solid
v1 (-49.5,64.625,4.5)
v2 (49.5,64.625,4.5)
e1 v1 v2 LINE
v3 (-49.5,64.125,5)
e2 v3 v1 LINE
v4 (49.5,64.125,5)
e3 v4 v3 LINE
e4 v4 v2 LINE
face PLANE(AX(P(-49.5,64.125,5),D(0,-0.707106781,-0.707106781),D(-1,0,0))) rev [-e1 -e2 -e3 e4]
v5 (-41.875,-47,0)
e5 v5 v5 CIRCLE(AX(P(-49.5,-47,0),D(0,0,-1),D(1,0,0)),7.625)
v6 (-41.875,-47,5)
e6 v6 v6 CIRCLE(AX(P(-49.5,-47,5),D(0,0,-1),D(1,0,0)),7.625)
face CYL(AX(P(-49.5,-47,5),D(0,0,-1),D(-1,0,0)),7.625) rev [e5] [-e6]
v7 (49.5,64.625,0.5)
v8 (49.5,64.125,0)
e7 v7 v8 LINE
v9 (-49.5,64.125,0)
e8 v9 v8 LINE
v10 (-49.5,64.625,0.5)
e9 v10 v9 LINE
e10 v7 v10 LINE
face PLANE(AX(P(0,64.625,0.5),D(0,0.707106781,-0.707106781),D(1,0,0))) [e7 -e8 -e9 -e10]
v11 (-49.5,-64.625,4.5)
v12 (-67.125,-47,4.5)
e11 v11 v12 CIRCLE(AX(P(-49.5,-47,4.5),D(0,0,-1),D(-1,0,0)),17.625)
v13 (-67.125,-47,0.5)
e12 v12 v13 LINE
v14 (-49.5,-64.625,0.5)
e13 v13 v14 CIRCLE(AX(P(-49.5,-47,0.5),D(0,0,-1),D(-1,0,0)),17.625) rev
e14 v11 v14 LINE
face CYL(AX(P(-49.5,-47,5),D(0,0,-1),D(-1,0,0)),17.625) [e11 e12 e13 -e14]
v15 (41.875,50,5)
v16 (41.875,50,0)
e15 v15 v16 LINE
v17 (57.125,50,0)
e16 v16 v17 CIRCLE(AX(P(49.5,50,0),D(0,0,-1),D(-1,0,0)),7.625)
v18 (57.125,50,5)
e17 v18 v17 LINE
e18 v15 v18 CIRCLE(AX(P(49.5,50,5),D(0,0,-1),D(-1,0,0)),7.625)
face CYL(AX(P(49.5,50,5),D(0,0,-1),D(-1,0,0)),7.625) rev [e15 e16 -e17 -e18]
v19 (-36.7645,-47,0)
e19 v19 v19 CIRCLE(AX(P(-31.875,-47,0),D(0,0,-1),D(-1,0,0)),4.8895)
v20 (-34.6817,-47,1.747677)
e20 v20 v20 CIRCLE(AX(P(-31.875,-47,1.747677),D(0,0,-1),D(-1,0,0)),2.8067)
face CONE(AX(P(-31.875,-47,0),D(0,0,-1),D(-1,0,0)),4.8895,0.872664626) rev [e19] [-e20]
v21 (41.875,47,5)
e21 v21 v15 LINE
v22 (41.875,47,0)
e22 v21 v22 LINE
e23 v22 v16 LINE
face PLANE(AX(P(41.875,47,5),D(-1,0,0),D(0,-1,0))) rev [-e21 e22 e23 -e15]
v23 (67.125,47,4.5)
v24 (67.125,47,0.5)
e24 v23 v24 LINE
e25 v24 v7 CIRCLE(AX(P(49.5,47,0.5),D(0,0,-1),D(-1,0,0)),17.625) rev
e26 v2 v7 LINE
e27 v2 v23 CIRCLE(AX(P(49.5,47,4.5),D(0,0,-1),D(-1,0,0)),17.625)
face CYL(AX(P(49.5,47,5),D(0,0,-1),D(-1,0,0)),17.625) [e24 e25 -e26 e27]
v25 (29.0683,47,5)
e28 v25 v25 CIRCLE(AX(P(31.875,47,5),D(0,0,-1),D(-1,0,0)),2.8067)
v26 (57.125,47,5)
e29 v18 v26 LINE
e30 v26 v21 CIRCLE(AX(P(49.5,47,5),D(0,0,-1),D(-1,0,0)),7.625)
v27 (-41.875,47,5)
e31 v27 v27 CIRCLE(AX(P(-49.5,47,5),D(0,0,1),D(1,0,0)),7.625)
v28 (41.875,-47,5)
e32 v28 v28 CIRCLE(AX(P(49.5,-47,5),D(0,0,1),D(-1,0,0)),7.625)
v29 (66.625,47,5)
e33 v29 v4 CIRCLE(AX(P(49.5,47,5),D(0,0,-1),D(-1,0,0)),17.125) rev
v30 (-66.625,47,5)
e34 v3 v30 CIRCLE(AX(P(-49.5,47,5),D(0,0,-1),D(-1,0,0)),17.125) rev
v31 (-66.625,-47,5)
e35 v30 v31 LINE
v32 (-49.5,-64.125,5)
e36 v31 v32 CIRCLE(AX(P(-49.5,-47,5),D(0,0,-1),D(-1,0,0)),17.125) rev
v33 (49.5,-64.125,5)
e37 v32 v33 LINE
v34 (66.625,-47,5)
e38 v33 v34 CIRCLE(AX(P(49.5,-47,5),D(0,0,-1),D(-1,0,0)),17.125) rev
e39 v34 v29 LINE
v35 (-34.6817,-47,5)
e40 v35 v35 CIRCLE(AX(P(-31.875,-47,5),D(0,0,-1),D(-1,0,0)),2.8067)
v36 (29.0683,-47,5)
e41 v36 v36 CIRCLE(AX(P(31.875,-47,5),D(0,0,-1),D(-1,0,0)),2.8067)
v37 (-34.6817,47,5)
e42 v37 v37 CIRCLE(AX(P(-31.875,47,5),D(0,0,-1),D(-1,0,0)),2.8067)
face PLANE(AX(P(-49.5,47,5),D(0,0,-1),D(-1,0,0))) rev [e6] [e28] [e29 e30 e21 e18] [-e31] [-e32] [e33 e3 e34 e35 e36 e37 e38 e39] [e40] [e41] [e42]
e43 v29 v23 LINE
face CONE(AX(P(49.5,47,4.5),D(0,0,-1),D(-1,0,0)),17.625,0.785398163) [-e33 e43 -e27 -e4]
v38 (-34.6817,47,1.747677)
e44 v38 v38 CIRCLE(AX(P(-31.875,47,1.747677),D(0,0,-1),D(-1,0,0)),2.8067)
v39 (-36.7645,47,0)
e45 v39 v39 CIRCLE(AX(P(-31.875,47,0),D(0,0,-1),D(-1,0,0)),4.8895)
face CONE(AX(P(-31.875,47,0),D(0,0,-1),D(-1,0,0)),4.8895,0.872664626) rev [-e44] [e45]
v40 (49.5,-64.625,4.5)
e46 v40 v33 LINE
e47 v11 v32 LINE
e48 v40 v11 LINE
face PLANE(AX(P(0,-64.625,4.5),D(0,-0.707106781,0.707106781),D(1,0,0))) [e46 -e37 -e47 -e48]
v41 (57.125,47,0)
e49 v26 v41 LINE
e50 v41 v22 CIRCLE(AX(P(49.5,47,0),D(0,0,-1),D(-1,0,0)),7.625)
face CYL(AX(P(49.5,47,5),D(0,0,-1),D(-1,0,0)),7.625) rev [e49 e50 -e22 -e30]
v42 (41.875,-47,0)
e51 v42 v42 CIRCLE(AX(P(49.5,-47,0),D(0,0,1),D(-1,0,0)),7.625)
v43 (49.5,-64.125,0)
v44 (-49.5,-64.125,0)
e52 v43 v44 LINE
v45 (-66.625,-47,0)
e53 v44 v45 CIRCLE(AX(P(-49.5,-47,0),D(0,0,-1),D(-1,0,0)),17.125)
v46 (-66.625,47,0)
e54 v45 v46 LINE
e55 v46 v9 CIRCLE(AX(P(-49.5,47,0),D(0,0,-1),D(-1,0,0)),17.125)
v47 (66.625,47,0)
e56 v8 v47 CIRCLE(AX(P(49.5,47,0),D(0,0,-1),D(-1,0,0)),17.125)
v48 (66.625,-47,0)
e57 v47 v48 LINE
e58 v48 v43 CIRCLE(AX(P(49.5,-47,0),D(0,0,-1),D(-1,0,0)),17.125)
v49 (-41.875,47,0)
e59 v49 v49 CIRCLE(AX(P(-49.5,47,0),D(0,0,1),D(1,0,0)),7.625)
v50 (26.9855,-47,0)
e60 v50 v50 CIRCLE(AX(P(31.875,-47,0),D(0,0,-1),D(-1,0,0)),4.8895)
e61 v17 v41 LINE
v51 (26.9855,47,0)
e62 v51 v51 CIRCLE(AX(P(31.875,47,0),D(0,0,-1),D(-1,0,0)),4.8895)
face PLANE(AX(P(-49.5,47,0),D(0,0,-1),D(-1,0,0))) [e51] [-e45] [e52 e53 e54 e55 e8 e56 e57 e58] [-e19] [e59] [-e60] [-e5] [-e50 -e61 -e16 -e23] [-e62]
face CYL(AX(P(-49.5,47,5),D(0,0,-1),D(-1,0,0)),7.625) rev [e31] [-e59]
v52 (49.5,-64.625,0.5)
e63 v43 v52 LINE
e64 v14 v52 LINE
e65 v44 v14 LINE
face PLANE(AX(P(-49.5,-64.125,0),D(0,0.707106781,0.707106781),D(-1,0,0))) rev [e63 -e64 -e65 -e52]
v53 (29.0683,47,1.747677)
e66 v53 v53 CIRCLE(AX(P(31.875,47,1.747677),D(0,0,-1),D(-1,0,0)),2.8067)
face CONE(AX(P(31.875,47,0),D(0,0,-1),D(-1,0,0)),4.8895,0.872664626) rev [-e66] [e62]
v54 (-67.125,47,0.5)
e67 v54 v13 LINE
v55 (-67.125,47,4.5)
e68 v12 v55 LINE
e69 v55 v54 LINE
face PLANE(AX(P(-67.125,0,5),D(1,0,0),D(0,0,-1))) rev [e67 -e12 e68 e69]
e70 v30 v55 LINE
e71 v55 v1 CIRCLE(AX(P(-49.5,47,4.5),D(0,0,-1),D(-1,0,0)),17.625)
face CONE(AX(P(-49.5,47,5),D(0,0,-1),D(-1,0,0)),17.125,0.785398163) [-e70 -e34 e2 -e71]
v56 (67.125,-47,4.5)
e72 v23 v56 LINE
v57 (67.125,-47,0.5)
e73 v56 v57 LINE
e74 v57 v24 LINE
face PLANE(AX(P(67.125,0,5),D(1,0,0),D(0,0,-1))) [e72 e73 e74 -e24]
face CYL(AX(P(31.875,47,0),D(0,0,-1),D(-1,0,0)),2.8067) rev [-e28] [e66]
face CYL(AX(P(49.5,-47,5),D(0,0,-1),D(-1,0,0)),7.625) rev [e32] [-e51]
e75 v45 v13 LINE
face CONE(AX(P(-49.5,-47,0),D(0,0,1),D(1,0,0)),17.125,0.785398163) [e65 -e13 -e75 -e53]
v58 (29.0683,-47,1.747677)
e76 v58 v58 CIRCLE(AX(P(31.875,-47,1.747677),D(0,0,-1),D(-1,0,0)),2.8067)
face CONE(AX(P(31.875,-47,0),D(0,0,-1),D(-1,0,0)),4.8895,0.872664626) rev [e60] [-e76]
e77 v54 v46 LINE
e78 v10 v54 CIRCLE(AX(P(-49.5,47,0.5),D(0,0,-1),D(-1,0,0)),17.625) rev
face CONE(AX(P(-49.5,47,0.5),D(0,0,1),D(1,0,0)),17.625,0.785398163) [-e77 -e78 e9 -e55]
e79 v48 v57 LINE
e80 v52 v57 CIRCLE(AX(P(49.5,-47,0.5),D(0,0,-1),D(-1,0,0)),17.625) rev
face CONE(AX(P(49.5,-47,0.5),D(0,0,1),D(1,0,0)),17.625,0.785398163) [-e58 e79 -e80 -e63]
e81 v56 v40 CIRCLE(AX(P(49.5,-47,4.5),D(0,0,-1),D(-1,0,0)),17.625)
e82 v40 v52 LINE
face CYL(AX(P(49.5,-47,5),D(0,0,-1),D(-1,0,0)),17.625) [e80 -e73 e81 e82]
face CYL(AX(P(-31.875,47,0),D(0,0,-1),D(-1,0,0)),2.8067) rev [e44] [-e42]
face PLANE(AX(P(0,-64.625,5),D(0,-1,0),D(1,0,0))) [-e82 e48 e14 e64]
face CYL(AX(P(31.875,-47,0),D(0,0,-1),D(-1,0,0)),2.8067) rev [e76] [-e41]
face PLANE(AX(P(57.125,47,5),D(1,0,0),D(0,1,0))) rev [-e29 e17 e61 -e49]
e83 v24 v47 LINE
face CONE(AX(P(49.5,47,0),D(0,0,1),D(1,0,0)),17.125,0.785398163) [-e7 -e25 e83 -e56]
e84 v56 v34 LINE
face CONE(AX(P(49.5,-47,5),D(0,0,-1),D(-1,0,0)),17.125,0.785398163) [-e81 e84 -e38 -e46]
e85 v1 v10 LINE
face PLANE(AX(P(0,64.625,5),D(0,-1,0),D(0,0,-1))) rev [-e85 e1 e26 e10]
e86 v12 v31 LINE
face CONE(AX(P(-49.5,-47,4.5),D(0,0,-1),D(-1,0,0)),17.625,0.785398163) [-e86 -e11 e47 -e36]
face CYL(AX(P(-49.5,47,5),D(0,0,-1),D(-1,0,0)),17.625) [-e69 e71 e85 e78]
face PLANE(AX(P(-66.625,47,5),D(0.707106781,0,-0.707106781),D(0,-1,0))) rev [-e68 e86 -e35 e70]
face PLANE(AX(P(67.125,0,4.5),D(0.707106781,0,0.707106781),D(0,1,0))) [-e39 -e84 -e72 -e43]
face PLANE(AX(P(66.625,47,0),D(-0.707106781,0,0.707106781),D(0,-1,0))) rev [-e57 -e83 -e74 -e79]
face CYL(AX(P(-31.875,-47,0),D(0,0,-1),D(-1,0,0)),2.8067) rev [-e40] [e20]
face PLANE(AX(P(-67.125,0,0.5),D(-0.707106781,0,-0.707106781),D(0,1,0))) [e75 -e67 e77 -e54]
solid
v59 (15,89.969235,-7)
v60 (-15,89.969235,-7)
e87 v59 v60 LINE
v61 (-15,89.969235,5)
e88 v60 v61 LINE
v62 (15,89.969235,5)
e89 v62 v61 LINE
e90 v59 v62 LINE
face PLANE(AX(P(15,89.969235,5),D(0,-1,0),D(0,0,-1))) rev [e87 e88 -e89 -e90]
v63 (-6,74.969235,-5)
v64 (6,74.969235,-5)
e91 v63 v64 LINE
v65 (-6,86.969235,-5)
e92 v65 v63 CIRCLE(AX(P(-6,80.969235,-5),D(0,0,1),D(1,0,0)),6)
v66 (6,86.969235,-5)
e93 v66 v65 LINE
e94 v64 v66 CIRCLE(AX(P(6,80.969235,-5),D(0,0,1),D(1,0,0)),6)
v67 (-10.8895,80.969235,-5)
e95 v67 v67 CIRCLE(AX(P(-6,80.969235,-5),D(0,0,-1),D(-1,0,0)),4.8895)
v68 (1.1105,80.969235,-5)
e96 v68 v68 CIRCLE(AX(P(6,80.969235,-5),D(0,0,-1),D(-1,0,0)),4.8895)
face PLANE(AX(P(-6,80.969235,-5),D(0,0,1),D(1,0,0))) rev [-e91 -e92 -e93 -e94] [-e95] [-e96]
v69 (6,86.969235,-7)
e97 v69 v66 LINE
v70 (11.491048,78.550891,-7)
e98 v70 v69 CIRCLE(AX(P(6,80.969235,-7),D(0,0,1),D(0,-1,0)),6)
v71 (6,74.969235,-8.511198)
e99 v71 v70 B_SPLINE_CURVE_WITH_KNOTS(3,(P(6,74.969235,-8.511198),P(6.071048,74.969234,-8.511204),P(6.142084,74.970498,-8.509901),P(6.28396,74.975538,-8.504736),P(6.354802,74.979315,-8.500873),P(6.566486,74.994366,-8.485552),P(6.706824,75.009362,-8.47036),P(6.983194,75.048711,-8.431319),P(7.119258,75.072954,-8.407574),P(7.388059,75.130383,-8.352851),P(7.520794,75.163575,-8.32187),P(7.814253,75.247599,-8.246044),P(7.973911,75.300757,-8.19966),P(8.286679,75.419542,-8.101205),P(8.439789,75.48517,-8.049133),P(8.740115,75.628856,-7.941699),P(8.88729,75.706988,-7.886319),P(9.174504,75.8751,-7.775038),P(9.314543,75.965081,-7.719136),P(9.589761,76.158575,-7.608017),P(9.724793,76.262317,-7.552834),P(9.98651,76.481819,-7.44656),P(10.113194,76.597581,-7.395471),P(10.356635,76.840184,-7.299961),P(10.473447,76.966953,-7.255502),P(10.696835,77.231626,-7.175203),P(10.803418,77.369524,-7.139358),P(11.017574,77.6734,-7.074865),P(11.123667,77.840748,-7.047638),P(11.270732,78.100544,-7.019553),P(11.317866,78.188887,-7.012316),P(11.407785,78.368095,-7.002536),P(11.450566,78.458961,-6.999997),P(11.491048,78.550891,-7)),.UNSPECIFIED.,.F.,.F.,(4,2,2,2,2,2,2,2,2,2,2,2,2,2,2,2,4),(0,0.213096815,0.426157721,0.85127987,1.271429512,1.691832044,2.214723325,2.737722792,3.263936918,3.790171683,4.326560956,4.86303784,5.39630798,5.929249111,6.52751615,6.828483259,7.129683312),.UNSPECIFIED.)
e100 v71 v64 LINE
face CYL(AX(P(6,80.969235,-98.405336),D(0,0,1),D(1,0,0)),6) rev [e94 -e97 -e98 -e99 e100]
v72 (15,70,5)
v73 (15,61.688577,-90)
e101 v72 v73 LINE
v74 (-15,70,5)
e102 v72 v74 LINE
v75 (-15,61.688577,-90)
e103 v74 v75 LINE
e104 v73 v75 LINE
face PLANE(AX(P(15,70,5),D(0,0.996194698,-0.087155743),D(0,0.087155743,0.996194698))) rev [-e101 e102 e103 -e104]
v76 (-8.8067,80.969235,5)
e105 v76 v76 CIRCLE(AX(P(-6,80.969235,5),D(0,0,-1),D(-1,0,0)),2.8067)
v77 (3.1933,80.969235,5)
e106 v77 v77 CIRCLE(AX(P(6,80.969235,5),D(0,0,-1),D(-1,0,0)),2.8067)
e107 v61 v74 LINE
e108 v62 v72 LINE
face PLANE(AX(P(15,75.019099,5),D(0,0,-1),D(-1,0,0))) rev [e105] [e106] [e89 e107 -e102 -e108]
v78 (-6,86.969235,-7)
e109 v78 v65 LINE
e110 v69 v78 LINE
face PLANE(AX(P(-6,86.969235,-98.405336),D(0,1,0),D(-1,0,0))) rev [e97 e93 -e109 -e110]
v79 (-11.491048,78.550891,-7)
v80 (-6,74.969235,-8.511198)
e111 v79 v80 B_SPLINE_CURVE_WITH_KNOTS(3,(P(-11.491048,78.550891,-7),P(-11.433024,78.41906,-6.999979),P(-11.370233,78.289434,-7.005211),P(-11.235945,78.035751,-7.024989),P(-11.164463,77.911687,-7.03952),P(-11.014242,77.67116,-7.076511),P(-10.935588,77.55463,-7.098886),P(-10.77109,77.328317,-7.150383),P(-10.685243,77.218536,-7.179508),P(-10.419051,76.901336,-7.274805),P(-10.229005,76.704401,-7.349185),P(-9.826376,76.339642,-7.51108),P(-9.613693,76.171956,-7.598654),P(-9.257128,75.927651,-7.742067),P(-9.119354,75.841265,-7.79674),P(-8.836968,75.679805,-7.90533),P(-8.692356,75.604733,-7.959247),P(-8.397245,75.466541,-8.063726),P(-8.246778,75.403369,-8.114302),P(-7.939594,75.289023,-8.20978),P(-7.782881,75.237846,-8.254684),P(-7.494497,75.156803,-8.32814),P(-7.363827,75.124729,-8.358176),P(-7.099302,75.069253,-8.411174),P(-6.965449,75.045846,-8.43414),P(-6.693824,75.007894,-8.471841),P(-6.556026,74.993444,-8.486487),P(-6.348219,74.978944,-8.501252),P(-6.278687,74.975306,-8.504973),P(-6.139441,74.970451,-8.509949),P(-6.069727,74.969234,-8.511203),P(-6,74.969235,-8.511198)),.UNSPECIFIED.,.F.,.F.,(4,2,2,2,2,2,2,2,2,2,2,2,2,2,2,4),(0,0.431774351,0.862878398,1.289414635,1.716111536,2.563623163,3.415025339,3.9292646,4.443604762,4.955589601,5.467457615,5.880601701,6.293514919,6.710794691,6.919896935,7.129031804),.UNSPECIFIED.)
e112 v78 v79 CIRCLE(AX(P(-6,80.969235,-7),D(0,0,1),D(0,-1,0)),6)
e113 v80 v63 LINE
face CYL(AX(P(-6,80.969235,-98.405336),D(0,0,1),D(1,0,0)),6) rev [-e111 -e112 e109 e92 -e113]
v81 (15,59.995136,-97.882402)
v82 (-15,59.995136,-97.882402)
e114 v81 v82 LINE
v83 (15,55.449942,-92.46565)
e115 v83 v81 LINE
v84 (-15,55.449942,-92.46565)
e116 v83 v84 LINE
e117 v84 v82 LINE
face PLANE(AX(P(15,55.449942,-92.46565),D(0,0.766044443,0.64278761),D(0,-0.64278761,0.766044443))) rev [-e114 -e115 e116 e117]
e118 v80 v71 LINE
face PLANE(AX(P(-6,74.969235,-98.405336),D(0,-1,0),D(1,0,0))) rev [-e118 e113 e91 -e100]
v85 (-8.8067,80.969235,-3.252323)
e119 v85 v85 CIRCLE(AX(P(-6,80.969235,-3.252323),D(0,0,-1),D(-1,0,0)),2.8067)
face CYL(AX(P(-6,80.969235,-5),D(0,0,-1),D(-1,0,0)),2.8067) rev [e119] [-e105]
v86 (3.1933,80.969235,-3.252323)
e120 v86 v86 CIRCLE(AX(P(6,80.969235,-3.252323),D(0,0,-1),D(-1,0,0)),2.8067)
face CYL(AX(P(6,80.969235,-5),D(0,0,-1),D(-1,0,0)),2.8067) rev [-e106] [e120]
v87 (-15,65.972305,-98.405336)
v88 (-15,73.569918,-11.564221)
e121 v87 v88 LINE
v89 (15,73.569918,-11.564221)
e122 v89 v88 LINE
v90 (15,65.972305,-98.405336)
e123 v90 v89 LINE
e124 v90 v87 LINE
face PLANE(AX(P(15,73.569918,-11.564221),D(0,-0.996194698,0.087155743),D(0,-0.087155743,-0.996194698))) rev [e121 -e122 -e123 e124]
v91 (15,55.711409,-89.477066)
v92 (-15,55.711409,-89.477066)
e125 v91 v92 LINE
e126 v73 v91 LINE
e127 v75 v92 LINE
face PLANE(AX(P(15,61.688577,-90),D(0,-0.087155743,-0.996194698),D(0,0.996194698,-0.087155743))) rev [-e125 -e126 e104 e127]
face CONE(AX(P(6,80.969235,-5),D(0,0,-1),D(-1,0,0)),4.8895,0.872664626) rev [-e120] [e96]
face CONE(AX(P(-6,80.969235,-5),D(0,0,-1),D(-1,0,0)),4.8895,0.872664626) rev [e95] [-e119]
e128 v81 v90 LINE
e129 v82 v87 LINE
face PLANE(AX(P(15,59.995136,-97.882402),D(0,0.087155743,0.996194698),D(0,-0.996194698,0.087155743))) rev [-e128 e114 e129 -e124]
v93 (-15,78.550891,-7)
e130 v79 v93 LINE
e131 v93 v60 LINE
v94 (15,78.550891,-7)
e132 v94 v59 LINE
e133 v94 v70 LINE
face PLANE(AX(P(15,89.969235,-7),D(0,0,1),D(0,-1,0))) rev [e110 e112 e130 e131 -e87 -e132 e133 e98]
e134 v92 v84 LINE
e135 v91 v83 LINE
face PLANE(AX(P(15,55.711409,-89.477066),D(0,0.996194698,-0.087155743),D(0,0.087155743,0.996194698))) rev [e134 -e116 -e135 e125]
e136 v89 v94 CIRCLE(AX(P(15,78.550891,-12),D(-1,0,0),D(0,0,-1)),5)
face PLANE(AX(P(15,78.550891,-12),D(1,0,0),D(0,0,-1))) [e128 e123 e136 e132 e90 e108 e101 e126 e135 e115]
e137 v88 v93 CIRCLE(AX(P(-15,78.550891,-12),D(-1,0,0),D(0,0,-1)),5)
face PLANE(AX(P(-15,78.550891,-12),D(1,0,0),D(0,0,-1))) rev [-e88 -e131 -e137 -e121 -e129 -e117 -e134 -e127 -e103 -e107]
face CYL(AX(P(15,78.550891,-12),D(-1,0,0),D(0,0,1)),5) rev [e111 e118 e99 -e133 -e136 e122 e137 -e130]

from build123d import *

# Parameters (mm, degrees)
SKETCH1_R                                          = 7.625
BOSS_EXTRUDE1_DEPTH                                = 5
CSK_FOR_10_FLAT_HEAD_MACHINE_SCREW_100_D           = 5.6134
CSK_FOR_10_FLAT_HEAD_MACHINE_SCREW_100_CSINK_D     = 9.779
CSK_FOR_10_FLAT_HEAD_MACHINE_SCREW_100_CSINK_ANGLE = 100
MIRROR1_START                                      = 1.747676612
MIRROR1_OUTLINE_R                                  = 7.625
MIRROR1_OUTLINE_R_2                                = 2.8067
MIRROR1_DEPTH                                      = 3.252323388
MIRROR1_2_OUTLINE_R                                = 7.625
MIRROR1_2_DEPTH                                    = 1.747676612
BOSS_EXTRUDE2_DEPTH                                = 15
CUT_EXTRUDE1_START                                 = -10
CUT_EXTRUDE1_DEPTH                                 = 143.620092016
CSK_FOR_10_FLAT_HEAD_MACHINE_SCREW_2_AT_COUNT      = 2
CSK_FOR_10_FLAT_HEAD_MACHINE_SCREW_2_AT_PITCH      = 12
CUT_EXTRUDE2_DEPTH                                 = 150.277724809
CHAMFER1_SIZE                                      = 0.5


with BuildPart() as part:
    # Sketch1 → Boss-Extrude1 (new body)
    with BuildSketch(Plane.XY):
        with BuildLine():
            Line((0, 0), (-67.125, 0))
            Line((-67.125, 0), (-67.125, 47))
            ThreePointArc((-67.125, 47), (-61.962757018, 59.462757018), (-49.5, 64.625))
            Line((-49.5, 64.625), (0, 64.625))
            Line((0, 64.625), (0, 0))
        make_face()
        with Locations((-49.5, 47)):
            Circle(SKETCH1_R, mode=Mode.SUBTRACT)
    extrude(amount=BOSS_EXTRUDE1_DEPTH)

    # CSK for _10 Flat Head Machine Screw _100 (through all)
    with Locations(Plane(origin=(-31.875, 47, 0), x_dir=(-1, 0, 0), z_dir=(0, 0, -1))):
        with Locations((0, 0)):
            CounterSinkHole(CSK_FOR_10_FLAT_HEAD_MACHINE_SCREW_100_D / 2, CSK_FOR_10_FLAT_HEAD_MACHINE_SCREW_100_CSINK_D / 2, counter_sink_angle=CSK_FOR_10_FLAT_HEAD_MACHINE_SCREW_100_CSINK_ANGLE)

    # Mirror1: read off the stored shape, not the designer's step
    # Mirror1 outline → Mirror1 (add)
    with BuildSketch(Plane.XY.offset(MIRROR1_START)):
        with BuildLine():
            Line((49.5, 64.625), (0, 64.625))
            Line((0, 64.625), (0, 0))
            Line((0, 0), (-67.125, 0))
            Line((-67.125, 0), (-67.125, -47))
            ThreePointArc((-67.125, -47), (-61.962757018, -59.462757018), (-49.5, -64.625))
            Line((-49.5, -64.625), (49.5, -64.625))
            ThreePointArc((49.5, -64.625), (61.962757018, -59.462757018), (67.125, -47))
            Line((67.125, -47), (67.125, 47))
            ThreePointArc((67.125, 47), (61.962757018, 59.462757018), (49.5, 64.625))
        make_face()
        with Locations((-49.5, -47)):
            Circle(MIRROR1_OUTLINE_R, mode=Mode.SUBTRACT)
        with Locations((-31.875, -47)):
            Circle(MIRROR1_OUTLINE_R_2, mode=Mode.SUBTRACT)
        with Locations((31.875, -47)):
            Circle(MIRROR1_OUTLINE_R_2, mode=Mode.SUBTRACT)
        with Locations((49.5, -47)):
            Circle(MIRROR1_OUTLINE_R, mode=Mode.SUBTRACT)
        with Locations((31.875, 47)):
            Circle(MIRROR1_OUTLINE_R_2, mode=Mode.SUBTRACT)
        with Locations((49.5, 47)):
            Circle(MIRROR1_OUTLINE_R, mode=Mode.SUBTRACT)
    extrude(amount=MIRROR1_DEPTH)

    # Mirror1 2 outline → Mirror1 2 (add)
    with BuildSketch(Plane.XY):
        with BuildLine():
            Line((49.5, 64.625), (0, 64.625))
            Line((0, 64.625), (0, 0))
            Line((0, 0), (-67.125, 0))
            Line((-67.125, 0), (-67.125, -47))
            ThreePointArc((-67.125, -47), (-61.962757018, -59.462757018), (-49.5, -64.625))
            Line((-49.5, -64.625), (49.5, -64.625))
            ThreePointArc((49.5, -64.625), (61.962757018, -59.462757018), (67.125, -47))
            Line((67.125, -47), (67.125, 47))
            ThreePointArc((67.125, 47), (61.962757018, 59.462757018), (49.5, 64.625))
        make_face()
        with Locations((-49.5, -47)):
            Circle(MIRROR1_2_OUTLINE_R, mode=Mode.SUBTRACT)
        with Locations((49.5, -47)):
            Circle(MIRROR1_2_OUTLINE_R, mode=Mode.SUBTRACT)
        with Locations((49.5, 47)):
            Circle(MIRROR1_2_OUTLINE_R, mode=Mode.SUBTRACT)
    extrude(amount=MIRROR1_2_DEPTH)

    # Mirror1 3: loft between two sections, ruled curve by curve
    mirror1_3_from = [
        Edge.make_three_point_arc((29.0683, 47, 1.747676712), (31.875, 49.8067, 1.747676712), (34.6817, 47, 1.747676712)),
        Edge.make_three_point_arc((34.6817, 47, 1.747676712), (31.875, 44.1933, 1.747676712), (29.0683, 47, 1.747676712)),
    ]
    mirror1_3_to = [
        Edge.make_three_point_arc((26.9855, 47, 0), (31.875, 51.8895, 0), (36.7645, 47, 0)),
        Edge.make_three_point_arc((36.7645, 47, 0), (31.875, 42.1105, 0), (26.9855, 47, 0)),
    ]
    mirror1_3 = Solid(Shell([*[Face.make_surface_from_curves(mirror1_3_from[k], mirror1_3_to[k]) for k in range(2)], Face(Wire(mirror1_3_from)), Face(Wire(mirror1_3_to))]))
    add(mirror1_3, mode=Mode.SUBTRACT)

    # Mirror1 4: loft between two sections, ruled curve by curve
    mirror1_4_from = [
        Edge.make_three_point_arc((-34.6817, -47, 1.747676712), (-31.875, -44.1933, 1.747676712), (-29.0683, -47, 1.747676712)),
        Edge.make_three_point_arc((-29.0683, -47, 1.747676712), (-31.875, -49.8067, 1.747676712), (-34.6817, -47, 1.747676712)),
    ]
    mirror1_4_to = [
        Edge.make_three_point_arc((-36.7645, -47, 0), (-31.875, -42.1105, 0), (-26.9855, -47, 0)),
        Edge.make_three_point_arc((-26.9855, -47, 0), (-31.875, -51.8895, 0), (-36.7645, -47, 0)),
    ]
    mirror1_4 = Solid(Shell([*[Face.make_surface_from_curves(mirror1_4_from[k], mirror1_4_to[k]) for k in range(2)], Face(Wire(mirror1_4_from)), Face(Wire(mirror1_4_to))]))
    add(mirror1_4, mode=Mode.SUBTRACT)

    # Mirror1 5: loft between two sections, ruled curve by curve
    mirror1_5_from = [
        Edge.make_three_point_arc((29.0683, -47, 1.747676712), (31.875, -44.1933, 1.747676712), (34.6817, -47, 1.747676712)),
        Edge.make_three_point_arc((34.6817, -47, 1.747676712), (31.875, -49.8067, 1.747676712), (29.0683, -47, 1.747676712)),
    ]
    mirror1_5_to = [
        Edge.make_three_point_arc((26.9855, -47, 0), (31.875, -42.1105, 0), (36.7645, -47, 0)),
        Edge.make_three_point_arc((36.7645, -47, 0), (31.875, -51.8895, 0), (26.9855, -47, 0)),
    ]
    mirror1_5 = Solid(Shell([*[Face.make_surface_from_curves(mirror1_5_from[k], mirror1_5_to[k]) for k in range(2)], Face(Wire(mirror1_5_from)), Face(Wire(mirror1_5_to))]))
    add(mirror1_5, mode=Mode.SUBTRACT)

    # Sketch8 → Cut-Extrude2 (cut, through all)
    with BuildSketch(Plane(origin=(0, 0, 0), x_dir=(-1, 0, 0), z_dir=(0, 0, -1))):
        with BuildLine():
            Line((-57.125, 47), (-57.125, 50))
            ThreePointArc((-57.125, 50), (-49.5, 57.625), (-41.875, 50))
            Line((-41.875, 50), (-41.875, 47))
            ThreePointArc((-41.875, 47), (-49.5, 39.375), (-57.125, 47))
        make_face()
    extrude(amount=-CUT_EXTRUDE2_DEPTH, mode=Mode.SUBTRACT)

    # Chamfer1
    chamfer1_edges = [part.edges().sort_by_distance(p)[0] for p in [
        (-61.962757018, 59.462757018, 5),
        (-67.125, 0, 5),
        (67.125, 0, 5),
        (61.962757018, 59.462757018, 5),
        (61.962757018, 59.462757018, 0),
        (67.125, 0, 0),
        (-61.962757018, -59.462757018, 5),
        (0, -64.625, 5),
        (0, -64.625, 0),
        (-61.962757018, -59.462757018, 0),
        (61.962757018, -59.462757018, 5),
        (61.962757018, -59.462757018, 0),
        (-67.125, 0, 0),
        (-61.962757018, 59.462757018, 0),
        (0, 64.625, 0),
        (0, 64.625, 5),
    ]]
    chamfer(chamfer1_edges, length=CHAMFER1_SIZE)


with BuildPart() as body_2:
    # Sketch2 → Boss-Extrude2 (new, symmetric)
    with BuildSketch(Plane(origin=(0, 0, 0), x_dir=(0, 0, -1), z_dir=(1, 0, 0))):
        with BuildLine():
            Line((-5, 70), (90, 61.688576965))
            Line((90, 61.688576965), (89.477065544, 55.711408776))
            Line((89.477065544, 55.711408776), (92.465649638, 55.449941548))
            Line((92.465649638, 55.449941548), (97.882401842, 59.995136325))
            Line((97.882401842, 59.995136325), (98.405336298, 65.972304514))
            Line((98.405336298, 65.972304514), (11.564221286, 73.569917605))
            ThreePointArc((11.564221286, 73.569917605), (8.313613316, 75.172940057), (7, 78.550891095))
            Line((7, 78.550891095), (7, 89.969235225))
            Line((7, 89.969235225), (-5, 89.969235225))
            Line((-5, 89.969235225), (-5, 75.019099188))
            Line((-5, 75.019099188), (-5, 70))
        make_face()
    extrude(amount=BOSS_EXTRUDE2_DEPTH, both=True)

    # Sketch3 → Cut-Extrude1 (cut, through all)
    with BuildSketch(Plane.XY.offset(5).offset(CUT_EXTRUDE1_START)):
        with BuildLine():
            Line((-6, 86.969235225), (6, 86.969235225))
            ThreePointArc((6, 86.969235225), (12, 80.969235225), (6, 74.969235225))
            Line((6, 74.969235225), (-6, 74.969235225))
            ThreePointArc((-6, 74.969235225), (-12, 80.969235225), (-6, 86.969235225))
        make_face()
    extrude(amount=-CUT_EXTRUDE1_DEPTH, mode=Mode.SUBTRACT)

    # Sketch4 → CSK for _10 Flat Head Machine Screw  2 (revolve, cut)
    with BuildSketch(Plane(origin=(-6, 80.969235225, -5), x_dir=(0, 1, 0), z_dir=(1, 0, 0))):
        Polygon((0, 0), (0, 10), (2.8067, 10), (2.8067, 1.747676712), (4.8895, 0), align=None)
    csk_for_10_flat_head_machine_screw_2 = revolve(axis=Axis((-6, 80.969235225, -11.35), (0, 0, 1)), mode=Mode.SUBTRACT)

    # CSK for _10 Flat Head Machine Screw 2 at: CSK for _10 Flat Head Machine Screw  2 ×2
    with Locations(*[(i * CSK_FOR_10_FLAT_HEAD_MACHINE_SCREW_2_AT_PITCH, 0, 0) for i in range(1, CSK_FOR_10_FLAT_HEAD_MACHINE_SCREW_2_AT_COUNT)]):
        add(csk_for_10_flat_head_machine_screw_2, mode=Mode.SUBTRACT)


solid = Compound([part.part, body_2.part])
